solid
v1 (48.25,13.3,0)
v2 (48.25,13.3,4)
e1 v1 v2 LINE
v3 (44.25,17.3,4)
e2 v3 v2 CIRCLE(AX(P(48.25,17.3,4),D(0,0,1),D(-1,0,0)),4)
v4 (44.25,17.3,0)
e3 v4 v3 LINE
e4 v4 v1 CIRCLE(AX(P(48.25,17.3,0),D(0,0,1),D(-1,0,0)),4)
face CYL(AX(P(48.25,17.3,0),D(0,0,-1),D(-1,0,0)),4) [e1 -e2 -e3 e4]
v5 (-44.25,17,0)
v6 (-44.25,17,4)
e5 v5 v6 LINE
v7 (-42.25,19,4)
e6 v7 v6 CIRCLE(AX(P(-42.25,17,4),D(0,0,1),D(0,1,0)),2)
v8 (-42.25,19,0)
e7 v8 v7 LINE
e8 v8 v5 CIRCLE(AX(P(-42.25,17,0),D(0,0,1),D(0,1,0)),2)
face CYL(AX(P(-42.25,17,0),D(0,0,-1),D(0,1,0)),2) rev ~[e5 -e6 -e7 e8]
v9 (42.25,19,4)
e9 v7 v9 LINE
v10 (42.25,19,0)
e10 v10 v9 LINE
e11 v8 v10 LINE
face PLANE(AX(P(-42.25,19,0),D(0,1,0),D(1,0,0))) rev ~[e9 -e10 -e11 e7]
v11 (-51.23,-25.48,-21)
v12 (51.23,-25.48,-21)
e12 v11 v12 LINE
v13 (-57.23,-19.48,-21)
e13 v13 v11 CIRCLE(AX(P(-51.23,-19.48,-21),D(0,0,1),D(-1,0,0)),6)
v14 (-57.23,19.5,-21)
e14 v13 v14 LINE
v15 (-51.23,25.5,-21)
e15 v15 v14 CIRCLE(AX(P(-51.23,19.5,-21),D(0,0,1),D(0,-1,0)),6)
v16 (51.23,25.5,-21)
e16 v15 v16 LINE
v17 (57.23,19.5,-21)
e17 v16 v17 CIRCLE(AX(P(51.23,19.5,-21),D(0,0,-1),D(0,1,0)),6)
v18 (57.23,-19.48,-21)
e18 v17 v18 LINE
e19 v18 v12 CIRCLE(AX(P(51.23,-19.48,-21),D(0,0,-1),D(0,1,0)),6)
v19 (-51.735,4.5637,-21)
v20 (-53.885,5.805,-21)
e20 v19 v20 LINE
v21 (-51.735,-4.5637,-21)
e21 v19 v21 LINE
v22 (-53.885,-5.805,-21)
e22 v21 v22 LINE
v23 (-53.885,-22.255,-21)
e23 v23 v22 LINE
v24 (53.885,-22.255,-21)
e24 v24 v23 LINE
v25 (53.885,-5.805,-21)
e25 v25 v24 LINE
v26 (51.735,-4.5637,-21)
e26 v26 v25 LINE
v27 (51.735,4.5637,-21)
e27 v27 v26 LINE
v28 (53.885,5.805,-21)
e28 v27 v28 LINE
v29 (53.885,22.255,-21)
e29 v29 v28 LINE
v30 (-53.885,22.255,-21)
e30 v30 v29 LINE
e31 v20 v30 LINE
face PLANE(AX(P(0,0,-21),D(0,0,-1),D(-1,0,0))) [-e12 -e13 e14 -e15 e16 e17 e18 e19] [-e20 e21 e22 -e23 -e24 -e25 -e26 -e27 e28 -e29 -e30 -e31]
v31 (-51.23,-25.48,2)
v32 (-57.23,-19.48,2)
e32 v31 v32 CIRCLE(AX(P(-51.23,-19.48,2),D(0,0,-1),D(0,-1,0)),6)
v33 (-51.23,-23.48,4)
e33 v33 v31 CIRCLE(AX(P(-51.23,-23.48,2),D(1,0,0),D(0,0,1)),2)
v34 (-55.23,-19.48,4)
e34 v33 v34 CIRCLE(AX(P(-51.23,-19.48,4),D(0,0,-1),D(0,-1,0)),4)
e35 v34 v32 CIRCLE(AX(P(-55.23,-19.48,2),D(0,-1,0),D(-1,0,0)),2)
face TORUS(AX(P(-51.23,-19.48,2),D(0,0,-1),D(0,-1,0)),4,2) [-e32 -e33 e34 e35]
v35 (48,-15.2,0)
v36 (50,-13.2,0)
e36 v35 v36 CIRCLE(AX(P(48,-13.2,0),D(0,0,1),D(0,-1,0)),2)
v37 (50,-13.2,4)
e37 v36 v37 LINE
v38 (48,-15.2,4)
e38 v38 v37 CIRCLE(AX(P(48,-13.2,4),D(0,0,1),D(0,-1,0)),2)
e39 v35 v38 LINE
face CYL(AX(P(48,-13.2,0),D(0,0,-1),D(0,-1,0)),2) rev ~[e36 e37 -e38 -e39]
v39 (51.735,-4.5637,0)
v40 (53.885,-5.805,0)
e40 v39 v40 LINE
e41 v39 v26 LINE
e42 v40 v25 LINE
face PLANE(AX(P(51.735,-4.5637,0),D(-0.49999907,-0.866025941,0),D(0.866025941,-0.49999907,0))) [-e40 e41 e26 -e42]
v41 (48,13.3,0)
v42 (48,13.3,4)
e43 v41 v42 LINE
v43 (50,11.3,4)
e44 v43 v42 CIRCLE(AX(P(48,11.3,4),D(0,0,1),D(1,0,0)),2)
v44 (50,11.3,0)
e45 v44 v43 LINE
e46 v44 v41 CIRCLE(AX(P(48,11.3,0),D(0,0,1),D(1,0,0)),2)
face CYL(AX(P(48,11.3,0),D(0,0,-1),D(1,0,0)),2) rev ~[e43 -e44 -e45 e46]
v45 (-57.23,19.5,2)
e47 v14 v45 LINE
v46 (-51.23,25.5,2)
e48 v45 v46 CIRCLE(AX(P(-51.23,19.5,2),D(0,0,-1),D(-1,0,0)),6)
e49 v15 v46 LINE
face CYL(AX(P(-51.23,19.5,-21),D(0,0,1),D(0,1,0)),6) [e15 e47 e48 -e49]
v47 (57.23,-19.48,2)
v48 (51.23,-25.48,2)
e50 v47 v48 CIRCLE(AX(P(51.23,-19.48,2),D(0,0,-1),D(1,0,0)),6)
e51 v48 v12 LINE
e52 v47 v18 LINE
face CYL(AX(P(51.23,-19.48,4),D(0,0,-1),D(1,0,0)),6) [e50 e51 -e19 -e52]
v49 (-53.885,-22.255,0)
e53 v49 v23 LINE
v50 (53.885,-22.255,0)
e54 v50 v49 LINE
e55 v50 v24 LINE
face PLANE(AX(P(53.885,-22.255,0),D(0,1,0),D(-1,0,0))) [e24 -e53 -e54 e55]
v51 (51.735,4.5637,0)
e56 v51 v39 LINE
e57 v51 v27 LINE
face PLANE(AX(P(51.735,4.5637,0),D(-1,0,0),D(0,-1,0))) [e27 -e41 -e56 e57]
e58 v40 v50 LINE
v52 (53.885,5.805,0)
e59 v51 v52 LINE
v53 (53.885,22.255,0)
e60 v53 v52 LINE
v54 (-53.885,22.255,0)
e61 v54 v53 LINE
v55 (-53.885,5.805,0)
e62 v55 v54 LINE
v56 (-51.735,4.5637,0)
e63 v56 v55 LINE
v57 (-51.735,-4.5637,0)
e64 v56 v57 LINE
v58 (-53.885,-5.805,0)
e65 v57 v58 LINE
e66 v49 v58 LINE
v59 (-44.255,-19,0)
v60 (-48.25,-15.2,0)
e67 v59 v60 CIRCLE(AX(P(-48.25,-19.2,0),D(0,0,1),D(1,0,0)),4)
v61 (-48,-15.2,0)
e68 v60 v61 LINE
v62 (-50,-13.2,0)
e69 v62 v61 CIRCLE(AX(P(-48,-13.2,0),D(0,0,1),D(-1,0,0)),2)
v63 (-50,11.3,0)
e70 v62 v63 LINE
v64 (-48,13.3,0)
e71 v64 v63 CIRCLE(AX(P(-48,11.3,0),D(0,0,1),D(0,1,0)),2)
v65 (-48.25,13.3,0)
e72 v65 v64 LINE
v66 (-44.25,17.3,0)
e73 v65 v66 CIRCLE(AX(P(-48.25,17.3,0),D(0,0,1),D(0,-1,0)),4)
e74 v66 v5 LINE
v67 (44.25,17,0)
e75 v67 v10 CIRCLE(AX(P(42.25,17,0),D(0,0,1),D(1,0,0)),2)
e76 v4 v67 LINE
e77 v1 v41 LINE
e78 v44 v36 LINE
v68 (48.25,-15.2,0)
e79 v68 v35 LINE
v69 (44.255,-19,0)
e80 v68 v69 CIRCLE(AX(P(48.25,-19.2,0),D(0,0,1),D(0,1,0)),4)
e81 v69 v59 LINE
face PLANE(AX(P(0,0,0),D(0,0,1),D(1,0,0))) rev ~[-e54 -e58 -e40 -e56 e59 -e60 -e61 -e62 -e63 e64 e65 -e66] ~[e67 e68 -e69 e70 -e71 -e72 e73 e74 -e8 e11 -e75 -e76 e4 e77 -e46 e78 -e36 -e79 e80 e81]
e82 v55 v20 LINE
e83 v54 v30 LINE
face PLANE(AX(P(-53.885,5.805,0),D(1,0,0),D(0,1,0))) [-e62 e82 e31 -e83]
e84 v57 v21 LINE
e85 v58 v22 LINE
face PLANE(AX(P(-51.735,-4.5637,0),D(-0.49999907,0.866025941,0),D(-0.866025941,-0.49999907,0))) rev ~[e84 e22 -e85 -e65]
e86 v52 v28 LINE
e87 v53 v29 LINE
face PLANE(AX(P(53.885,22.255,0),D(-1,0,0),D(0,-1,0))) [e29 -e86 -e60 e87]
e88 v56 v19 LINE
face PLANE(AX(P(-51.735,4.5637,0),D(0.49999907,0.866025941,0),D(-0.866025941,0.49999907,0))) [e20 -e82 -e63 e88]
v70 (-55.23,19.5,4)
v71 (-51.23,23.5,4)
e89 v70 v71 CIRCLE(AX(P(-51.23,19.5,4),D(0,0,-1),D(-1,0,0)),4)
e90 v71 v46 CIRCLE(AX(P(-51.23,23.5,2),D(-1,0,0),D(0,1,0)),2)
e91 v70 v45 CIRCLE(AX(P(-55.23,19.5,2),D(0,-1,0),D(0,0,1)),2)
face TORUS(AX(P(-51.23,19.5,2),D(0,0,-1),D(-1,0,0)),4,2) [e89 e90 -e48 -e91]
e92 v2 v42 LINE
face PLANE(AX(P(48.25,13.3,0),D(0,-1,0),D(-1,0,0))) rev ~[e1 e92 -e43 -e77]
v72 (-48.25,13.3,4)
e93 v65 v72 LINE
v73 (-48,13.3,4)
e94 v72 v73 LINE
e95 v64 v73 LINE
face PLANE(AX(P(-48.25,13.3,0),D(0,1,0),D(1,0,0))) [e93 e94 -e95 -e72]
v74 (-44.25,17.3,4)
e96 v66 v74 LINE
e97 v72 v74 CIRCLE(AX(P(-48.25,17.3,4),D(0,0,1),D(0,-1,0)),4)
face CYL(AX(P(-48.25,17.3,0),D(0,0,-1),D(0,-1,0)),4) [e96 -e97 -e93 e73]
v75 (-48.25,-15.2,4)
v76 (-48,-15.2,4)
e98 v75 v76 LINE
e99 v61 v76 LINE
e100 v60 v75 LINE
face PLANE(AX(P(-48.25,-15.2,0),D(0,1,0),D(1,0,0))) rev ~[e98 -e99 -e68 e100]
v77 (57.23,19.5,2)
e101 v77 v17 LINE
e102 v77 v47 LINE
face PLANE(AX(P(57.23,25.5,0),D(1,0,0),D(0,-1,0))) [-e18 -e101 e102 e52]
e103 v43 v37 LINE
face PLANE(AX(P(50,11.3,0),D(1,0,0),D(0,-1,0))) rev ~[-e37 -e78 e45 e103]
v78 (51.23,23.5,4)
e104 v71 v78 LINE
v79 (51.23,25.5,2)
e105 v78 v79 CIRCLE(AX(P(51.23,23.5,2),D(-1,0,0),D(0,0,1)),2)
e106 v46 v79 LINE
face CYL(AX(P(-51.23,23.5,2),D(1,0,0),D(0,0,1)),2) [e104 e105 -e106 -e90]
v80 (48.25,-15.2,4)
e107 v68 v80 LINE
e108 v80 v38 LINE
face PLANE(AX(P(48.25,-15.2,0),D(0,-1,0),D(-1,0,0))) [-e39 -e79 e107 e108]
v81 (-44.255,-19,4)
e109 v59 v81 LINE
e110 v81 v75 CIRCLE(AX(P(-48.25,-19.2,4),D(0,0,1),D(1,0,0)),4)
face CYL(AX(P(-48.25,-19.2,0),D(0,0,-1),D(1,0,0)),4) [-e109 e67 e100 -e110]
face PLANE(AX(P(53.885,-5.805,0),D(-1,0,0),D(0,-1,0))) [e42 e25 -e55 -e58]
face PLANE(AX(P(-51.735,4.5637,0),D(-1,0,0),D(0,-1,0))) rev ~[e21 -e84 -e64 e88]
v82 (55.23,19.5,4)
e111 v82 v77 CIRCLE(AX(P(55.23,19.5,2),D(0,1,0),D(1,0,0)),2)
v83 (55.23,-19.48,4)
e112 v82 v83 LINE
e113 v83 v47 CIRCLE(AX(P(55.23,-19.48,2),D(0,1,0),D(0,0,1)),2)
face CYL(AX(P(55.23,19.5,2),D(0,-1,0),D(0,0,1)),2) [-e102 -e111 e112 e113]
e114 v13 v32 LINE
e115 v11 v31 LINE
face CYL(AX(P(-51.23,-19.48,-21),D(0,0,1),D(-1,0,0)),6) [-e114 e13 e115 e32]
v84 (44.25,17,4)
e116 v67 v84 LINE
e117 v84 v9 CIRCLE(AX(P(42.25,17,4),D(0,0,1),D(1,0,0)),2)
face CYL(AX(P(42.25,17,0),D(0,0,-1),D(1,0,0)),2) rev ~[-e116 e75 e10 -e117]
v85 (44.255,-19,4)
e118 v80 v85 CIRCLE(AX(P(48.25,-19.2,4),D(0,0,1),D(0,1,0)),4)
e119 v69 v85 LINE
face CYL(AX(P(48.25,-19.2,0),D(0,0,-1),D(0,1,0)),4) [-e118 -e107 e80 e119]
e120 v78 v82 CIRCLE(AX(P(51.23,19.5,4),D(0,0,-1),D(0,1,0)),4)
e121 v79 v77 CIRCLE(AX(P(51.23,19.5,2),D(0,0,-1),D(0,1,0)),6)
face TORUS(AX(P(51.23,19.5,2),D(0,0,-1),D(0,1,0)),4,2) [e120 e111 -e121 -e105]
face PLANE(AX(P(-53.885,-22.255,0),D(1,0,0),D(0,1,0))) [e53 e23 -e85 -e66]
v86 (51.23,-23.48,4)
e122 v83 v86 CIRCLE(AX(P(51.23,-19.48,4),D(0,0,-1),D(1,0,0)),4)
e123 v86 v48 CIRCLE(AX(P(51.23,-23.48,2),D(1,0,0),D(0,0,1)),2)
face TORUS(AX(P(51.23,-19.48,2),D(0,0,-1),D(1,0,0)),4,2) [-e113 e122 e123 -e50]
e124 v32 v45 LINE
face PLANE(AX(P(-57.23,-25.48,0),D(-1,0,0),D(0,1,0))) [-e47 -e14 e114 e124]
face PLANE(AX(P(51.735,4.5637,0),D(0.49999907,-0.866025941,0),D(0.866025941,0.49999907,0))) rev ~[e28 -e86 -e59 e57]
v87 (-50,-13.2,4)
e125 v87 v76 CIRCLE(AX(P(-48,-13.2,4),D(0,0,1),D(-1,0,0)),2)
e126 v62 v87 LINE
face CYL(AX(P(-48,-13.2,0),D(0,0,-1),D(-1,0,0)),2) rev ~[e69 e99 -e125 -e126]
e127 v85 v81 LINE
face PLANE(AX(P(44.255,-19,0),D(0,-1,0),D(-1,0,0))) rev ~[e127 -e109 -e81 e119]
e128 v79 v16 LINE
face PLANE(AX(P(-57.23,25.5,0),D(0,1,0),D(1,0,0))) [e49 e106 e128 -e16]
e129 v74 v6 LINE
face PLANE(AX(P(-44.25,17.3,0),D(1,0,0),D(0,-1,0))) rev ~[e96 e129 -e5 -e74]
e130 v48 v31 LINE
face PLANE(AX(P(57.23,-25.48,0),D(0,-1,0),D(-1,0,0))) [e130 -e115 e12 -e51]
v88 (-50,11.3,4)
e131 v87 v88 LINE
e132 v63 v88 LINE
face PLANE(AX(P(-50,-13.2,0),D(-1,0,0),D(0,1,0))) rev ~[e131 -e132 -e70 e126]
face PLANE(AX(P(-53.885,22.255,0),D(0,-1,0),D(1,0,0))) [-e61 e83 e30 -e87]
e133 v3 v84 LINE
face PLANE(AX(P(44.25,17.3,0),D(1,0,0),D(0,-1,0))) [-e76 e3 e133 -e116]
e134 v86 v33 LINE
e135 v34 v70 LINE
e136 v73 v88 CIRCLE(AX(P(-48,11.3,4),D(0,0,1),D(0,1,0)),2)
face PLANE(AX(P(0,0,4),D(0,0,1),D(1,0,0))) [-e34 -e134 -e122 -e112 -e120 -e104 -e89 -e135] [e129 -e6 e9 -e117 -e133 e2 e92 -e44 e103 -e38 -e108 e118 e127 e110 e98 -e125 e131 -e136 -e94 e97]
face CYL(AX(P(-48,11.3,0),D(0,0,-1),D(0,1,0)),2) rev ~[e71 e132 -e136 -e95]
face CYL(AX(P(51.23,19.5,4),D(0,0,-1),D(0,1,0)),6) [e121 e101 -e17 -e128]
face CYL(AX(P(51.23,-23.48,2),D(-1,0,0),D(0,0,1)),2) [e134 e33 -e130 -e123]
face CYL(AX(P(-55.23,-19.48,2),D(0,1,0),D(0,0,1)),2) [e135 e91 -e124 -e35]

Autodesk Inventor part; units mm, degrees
ref_plane "YZ Plane" through (0, 0, 0) normal (1, 0, 0) x (0, 1, 0)
ref_plane "XZ Plane" through (0, 0, 0) normal (0, 1, 0) x (-1, 0, 0)
ref_plane "XY Plane" through (0, 0, 0) normal (0, 0, 1) x (1, 0, 0)
sketch "Sketch1" plane through (0, 0, 0) normal (0, 0, 1) x (1, 0, 0)
  line L0 (-57.23, 25.5) -> (57.23, 25.5)
  line L1 (57.23, 25.5) -> (57.23, -25.48)
  line L2 (57.23, -25.48) -> (-57.23, -25.48)
  line L3 (-57.23, -25.48) -> (-57.23, 25.5)
  line L4 (-42.25, 19) -> (42.25, 19)
  line L5 (50, 11.3) -> (50, -13.2)
  line L6 (-50, -13.2) -> (-50, 11.3)
  line L7 (-53.6456, 17.3) -> (53.2492, 17.3) construction
  line L8 (-53.6456, -19.2) -> (53.2492, -19.2) construction
  line L9 (48.25, -31.9957) -> (48.25, 43.3545) construction
  line L10 (-48.25, 39.0692) -> (-48.25, -34.8525) construction
  line L11 (48.25, -15.2) -> (48, -15.2)
  line L12 (48.25, 13.3) -> (48, 13.3)
  line L13 (44.25, 17.3) -> (44.25, 17)
  line L14 (-48.25, 13.3) -> (-48, 13.3)
  line L15 (-44.25, 17.3) -> (-44.25, 17)
  line L16 (-48.25, -15.2) -> (-48, -15.2)
  arc A0 (-50, -13.2) -> (-48, -15.2) centre (-48, -13.2) ccw
  arc A1 (-48, 13.3) -> (-50, 11.3) centre (-48, 11.3) ccw
  arc A2 (-42.25, 19) -> (-44.25, 17) centre (-42.25, 17) ccw
  arc A3 (44.25, 17) -> (42.25, 19) centre (42.25, 17) ccw
  arc A4 (50, 11.3) -> (48, 13.3) centre (48, 11.3) ccw
  arc A5 (48, -15.2) -> (50, -13.2) centre (48, -13.2) ccw
  arc A6 (52.25, 17.3) -> (48.25, 21.3) centre (48.25, 17.3) ccw
  arc A7 (44.25, 17.3) -> (48.25, 13.3) centre (48.25, 17.3) ccw
  arc A8 (48.25, -15.2) -> (44.25, -19.2) centre (48.25, -19.2) ccw
  arc A9 (48.25, -23.2) -> (52.25, -19.2) centre (48.25, -19.2) ccw
  line L17 (50, -19) -> (48.25, -19)
  arc A10 (-48.25, 13.3) -> (-44.25, 17.3) centre (-48.25, 17.3) ccw
  arc A11 (-48.25, 21.3) -> (-52.25, 17.3) centre (-48.25, 17.3) ccw
  arc A12 (-44.25, -19.2) -> (-48.25, -15.2) centre (-48.25, -19.2) ccw
  arc A13 (-52.25, -19.2) -> (-48.25, -23.2) centre (-48.25, -19.2) ccw
  line L18 (44.255, -19) -> (-44.255, -19)
  line L19 (-48.25, -19) -> (-50, -19)
  point P0 (0, 0)
  point P1 (-50, 19)
  point P2 (50, 19)
  point P3 (-50, 13.3)
  point P4 (-50, -15.2)
  dimension "d0" = 114.46
  dimension "d1" = 57.23
  dimension "d2" = 25.5
  dimension "d3" = 25.48
  dimension "d4" = 100
  dimension "d10" = 50
  dimension "d11" = 17.3
  dimension "d12" = 19.2
  dimension "d13" = 96.5
  dimension "d14" = 48.25
  dimension "d19" = 2
  dimension "d20" = 2
extrude "Extrusion1" add sketch "Sketch1" along normal blind 4
sketch "Sketch2" plane through (0, 0, 0) normal (0, 0, -1) x (-1, 0, 0)
  line L0 (57.23, -25.48) -> (57.23, 25.5) projected
  line L1 (57.23, -25.48) -> (-57.23, -25.48) projected
  line L2 (57.23, 25.5) -> (-57.23, 25.5)
  line L3 (-57.23, 25.5) -> (-57.23, -25.48)
  line L4 (-57.23, -25.48) -> (57.23, -25.48)
  line L5 (57.23, -25.48) -> (57.23, 25.5)
  line L6 (53.885, 22.255) -> (-53.885, 22.255)
  line L7 (-53.885, 22.255) -> (-53.885, -22.255)
  line L8 (-53.885, -22.255) -> (53.885, -22.255)
  line L9 (53.885, -22.255) -> (53.885, 22.255)
  line L10 (-53.885, 5.805) -> (-51.735, 5.805)
  line L11 (-51.735, 5.805) -> (-51.735, -5.805)
  line L12 (-51.735, -5.805) -> (-53.885, -5.805)
  line L13 (-53.885, -5.805) -> (-53.885, 5.805)
  line L14 (53.885, 5.805) -> (51.735, 5.805)
  line L15 (51.735, 5.805) -> (51.735, -5.805)
  line L16 (51.735, -5.805) -> (53.885, -5.805)
  line L17 (53.885, -5.805) -> (53.885, 5.805)
  line L18 (-51.735, 4.5637) -> (-53.885, 5.805)
  line L19 (-51.735, -4.5637) -> (-53.885, -5.805)
  line L20 (51.735, 4.5637) -> (53.885, 5.805)
  line L21 (51.735, -4.5637) -> (53.885, -5.805)
  point P0 (0, 0)
  dimension "d23" = 44.51
  dimension "d24" = 22.255
  dimension "d25" = 107.77
  dimension "d26" = 53.885
  dimension "d28" = 103.47
  dimension "d30" = 51.735
  dimension "d31" = 11.61
  dimension "d32" = 5.805
  dimension "d33" = 11.61
  dimension "d34" = 5.805
  dimension "d35" = 30
  dimension "d36" = 30
  dimension "d37" = 30
  dimension "d38" = 30
extrude "Extrusion2" add sketch "Sketch2" along normal blind 21 contours L1 L3 L2 L0 | L9 L21 L15 L20 | L18 L11 L19 L7
fillet "Fillet1" radius 6 4 edges at (57.23, 25.5, -8.5) (-57.23, 25.5, -8.5) (57.23, -25.48, -8.5) (-57.23, -25.48, -8.5)
fillet "Fillet2" radius 2 8 edges at (0, -25.48, 4) (55.4726, -23.7226, 4) (57.23, 0.01, 4) (55.4726, 23.7426, 4) (0, 25.5, 4) (-55.4726, 23.7426, 4) (-57.23, 0.01, 4) (-55.4726, -23.7226, 4)
properties part number "EC3BK-40mm_Case_EndCap"
